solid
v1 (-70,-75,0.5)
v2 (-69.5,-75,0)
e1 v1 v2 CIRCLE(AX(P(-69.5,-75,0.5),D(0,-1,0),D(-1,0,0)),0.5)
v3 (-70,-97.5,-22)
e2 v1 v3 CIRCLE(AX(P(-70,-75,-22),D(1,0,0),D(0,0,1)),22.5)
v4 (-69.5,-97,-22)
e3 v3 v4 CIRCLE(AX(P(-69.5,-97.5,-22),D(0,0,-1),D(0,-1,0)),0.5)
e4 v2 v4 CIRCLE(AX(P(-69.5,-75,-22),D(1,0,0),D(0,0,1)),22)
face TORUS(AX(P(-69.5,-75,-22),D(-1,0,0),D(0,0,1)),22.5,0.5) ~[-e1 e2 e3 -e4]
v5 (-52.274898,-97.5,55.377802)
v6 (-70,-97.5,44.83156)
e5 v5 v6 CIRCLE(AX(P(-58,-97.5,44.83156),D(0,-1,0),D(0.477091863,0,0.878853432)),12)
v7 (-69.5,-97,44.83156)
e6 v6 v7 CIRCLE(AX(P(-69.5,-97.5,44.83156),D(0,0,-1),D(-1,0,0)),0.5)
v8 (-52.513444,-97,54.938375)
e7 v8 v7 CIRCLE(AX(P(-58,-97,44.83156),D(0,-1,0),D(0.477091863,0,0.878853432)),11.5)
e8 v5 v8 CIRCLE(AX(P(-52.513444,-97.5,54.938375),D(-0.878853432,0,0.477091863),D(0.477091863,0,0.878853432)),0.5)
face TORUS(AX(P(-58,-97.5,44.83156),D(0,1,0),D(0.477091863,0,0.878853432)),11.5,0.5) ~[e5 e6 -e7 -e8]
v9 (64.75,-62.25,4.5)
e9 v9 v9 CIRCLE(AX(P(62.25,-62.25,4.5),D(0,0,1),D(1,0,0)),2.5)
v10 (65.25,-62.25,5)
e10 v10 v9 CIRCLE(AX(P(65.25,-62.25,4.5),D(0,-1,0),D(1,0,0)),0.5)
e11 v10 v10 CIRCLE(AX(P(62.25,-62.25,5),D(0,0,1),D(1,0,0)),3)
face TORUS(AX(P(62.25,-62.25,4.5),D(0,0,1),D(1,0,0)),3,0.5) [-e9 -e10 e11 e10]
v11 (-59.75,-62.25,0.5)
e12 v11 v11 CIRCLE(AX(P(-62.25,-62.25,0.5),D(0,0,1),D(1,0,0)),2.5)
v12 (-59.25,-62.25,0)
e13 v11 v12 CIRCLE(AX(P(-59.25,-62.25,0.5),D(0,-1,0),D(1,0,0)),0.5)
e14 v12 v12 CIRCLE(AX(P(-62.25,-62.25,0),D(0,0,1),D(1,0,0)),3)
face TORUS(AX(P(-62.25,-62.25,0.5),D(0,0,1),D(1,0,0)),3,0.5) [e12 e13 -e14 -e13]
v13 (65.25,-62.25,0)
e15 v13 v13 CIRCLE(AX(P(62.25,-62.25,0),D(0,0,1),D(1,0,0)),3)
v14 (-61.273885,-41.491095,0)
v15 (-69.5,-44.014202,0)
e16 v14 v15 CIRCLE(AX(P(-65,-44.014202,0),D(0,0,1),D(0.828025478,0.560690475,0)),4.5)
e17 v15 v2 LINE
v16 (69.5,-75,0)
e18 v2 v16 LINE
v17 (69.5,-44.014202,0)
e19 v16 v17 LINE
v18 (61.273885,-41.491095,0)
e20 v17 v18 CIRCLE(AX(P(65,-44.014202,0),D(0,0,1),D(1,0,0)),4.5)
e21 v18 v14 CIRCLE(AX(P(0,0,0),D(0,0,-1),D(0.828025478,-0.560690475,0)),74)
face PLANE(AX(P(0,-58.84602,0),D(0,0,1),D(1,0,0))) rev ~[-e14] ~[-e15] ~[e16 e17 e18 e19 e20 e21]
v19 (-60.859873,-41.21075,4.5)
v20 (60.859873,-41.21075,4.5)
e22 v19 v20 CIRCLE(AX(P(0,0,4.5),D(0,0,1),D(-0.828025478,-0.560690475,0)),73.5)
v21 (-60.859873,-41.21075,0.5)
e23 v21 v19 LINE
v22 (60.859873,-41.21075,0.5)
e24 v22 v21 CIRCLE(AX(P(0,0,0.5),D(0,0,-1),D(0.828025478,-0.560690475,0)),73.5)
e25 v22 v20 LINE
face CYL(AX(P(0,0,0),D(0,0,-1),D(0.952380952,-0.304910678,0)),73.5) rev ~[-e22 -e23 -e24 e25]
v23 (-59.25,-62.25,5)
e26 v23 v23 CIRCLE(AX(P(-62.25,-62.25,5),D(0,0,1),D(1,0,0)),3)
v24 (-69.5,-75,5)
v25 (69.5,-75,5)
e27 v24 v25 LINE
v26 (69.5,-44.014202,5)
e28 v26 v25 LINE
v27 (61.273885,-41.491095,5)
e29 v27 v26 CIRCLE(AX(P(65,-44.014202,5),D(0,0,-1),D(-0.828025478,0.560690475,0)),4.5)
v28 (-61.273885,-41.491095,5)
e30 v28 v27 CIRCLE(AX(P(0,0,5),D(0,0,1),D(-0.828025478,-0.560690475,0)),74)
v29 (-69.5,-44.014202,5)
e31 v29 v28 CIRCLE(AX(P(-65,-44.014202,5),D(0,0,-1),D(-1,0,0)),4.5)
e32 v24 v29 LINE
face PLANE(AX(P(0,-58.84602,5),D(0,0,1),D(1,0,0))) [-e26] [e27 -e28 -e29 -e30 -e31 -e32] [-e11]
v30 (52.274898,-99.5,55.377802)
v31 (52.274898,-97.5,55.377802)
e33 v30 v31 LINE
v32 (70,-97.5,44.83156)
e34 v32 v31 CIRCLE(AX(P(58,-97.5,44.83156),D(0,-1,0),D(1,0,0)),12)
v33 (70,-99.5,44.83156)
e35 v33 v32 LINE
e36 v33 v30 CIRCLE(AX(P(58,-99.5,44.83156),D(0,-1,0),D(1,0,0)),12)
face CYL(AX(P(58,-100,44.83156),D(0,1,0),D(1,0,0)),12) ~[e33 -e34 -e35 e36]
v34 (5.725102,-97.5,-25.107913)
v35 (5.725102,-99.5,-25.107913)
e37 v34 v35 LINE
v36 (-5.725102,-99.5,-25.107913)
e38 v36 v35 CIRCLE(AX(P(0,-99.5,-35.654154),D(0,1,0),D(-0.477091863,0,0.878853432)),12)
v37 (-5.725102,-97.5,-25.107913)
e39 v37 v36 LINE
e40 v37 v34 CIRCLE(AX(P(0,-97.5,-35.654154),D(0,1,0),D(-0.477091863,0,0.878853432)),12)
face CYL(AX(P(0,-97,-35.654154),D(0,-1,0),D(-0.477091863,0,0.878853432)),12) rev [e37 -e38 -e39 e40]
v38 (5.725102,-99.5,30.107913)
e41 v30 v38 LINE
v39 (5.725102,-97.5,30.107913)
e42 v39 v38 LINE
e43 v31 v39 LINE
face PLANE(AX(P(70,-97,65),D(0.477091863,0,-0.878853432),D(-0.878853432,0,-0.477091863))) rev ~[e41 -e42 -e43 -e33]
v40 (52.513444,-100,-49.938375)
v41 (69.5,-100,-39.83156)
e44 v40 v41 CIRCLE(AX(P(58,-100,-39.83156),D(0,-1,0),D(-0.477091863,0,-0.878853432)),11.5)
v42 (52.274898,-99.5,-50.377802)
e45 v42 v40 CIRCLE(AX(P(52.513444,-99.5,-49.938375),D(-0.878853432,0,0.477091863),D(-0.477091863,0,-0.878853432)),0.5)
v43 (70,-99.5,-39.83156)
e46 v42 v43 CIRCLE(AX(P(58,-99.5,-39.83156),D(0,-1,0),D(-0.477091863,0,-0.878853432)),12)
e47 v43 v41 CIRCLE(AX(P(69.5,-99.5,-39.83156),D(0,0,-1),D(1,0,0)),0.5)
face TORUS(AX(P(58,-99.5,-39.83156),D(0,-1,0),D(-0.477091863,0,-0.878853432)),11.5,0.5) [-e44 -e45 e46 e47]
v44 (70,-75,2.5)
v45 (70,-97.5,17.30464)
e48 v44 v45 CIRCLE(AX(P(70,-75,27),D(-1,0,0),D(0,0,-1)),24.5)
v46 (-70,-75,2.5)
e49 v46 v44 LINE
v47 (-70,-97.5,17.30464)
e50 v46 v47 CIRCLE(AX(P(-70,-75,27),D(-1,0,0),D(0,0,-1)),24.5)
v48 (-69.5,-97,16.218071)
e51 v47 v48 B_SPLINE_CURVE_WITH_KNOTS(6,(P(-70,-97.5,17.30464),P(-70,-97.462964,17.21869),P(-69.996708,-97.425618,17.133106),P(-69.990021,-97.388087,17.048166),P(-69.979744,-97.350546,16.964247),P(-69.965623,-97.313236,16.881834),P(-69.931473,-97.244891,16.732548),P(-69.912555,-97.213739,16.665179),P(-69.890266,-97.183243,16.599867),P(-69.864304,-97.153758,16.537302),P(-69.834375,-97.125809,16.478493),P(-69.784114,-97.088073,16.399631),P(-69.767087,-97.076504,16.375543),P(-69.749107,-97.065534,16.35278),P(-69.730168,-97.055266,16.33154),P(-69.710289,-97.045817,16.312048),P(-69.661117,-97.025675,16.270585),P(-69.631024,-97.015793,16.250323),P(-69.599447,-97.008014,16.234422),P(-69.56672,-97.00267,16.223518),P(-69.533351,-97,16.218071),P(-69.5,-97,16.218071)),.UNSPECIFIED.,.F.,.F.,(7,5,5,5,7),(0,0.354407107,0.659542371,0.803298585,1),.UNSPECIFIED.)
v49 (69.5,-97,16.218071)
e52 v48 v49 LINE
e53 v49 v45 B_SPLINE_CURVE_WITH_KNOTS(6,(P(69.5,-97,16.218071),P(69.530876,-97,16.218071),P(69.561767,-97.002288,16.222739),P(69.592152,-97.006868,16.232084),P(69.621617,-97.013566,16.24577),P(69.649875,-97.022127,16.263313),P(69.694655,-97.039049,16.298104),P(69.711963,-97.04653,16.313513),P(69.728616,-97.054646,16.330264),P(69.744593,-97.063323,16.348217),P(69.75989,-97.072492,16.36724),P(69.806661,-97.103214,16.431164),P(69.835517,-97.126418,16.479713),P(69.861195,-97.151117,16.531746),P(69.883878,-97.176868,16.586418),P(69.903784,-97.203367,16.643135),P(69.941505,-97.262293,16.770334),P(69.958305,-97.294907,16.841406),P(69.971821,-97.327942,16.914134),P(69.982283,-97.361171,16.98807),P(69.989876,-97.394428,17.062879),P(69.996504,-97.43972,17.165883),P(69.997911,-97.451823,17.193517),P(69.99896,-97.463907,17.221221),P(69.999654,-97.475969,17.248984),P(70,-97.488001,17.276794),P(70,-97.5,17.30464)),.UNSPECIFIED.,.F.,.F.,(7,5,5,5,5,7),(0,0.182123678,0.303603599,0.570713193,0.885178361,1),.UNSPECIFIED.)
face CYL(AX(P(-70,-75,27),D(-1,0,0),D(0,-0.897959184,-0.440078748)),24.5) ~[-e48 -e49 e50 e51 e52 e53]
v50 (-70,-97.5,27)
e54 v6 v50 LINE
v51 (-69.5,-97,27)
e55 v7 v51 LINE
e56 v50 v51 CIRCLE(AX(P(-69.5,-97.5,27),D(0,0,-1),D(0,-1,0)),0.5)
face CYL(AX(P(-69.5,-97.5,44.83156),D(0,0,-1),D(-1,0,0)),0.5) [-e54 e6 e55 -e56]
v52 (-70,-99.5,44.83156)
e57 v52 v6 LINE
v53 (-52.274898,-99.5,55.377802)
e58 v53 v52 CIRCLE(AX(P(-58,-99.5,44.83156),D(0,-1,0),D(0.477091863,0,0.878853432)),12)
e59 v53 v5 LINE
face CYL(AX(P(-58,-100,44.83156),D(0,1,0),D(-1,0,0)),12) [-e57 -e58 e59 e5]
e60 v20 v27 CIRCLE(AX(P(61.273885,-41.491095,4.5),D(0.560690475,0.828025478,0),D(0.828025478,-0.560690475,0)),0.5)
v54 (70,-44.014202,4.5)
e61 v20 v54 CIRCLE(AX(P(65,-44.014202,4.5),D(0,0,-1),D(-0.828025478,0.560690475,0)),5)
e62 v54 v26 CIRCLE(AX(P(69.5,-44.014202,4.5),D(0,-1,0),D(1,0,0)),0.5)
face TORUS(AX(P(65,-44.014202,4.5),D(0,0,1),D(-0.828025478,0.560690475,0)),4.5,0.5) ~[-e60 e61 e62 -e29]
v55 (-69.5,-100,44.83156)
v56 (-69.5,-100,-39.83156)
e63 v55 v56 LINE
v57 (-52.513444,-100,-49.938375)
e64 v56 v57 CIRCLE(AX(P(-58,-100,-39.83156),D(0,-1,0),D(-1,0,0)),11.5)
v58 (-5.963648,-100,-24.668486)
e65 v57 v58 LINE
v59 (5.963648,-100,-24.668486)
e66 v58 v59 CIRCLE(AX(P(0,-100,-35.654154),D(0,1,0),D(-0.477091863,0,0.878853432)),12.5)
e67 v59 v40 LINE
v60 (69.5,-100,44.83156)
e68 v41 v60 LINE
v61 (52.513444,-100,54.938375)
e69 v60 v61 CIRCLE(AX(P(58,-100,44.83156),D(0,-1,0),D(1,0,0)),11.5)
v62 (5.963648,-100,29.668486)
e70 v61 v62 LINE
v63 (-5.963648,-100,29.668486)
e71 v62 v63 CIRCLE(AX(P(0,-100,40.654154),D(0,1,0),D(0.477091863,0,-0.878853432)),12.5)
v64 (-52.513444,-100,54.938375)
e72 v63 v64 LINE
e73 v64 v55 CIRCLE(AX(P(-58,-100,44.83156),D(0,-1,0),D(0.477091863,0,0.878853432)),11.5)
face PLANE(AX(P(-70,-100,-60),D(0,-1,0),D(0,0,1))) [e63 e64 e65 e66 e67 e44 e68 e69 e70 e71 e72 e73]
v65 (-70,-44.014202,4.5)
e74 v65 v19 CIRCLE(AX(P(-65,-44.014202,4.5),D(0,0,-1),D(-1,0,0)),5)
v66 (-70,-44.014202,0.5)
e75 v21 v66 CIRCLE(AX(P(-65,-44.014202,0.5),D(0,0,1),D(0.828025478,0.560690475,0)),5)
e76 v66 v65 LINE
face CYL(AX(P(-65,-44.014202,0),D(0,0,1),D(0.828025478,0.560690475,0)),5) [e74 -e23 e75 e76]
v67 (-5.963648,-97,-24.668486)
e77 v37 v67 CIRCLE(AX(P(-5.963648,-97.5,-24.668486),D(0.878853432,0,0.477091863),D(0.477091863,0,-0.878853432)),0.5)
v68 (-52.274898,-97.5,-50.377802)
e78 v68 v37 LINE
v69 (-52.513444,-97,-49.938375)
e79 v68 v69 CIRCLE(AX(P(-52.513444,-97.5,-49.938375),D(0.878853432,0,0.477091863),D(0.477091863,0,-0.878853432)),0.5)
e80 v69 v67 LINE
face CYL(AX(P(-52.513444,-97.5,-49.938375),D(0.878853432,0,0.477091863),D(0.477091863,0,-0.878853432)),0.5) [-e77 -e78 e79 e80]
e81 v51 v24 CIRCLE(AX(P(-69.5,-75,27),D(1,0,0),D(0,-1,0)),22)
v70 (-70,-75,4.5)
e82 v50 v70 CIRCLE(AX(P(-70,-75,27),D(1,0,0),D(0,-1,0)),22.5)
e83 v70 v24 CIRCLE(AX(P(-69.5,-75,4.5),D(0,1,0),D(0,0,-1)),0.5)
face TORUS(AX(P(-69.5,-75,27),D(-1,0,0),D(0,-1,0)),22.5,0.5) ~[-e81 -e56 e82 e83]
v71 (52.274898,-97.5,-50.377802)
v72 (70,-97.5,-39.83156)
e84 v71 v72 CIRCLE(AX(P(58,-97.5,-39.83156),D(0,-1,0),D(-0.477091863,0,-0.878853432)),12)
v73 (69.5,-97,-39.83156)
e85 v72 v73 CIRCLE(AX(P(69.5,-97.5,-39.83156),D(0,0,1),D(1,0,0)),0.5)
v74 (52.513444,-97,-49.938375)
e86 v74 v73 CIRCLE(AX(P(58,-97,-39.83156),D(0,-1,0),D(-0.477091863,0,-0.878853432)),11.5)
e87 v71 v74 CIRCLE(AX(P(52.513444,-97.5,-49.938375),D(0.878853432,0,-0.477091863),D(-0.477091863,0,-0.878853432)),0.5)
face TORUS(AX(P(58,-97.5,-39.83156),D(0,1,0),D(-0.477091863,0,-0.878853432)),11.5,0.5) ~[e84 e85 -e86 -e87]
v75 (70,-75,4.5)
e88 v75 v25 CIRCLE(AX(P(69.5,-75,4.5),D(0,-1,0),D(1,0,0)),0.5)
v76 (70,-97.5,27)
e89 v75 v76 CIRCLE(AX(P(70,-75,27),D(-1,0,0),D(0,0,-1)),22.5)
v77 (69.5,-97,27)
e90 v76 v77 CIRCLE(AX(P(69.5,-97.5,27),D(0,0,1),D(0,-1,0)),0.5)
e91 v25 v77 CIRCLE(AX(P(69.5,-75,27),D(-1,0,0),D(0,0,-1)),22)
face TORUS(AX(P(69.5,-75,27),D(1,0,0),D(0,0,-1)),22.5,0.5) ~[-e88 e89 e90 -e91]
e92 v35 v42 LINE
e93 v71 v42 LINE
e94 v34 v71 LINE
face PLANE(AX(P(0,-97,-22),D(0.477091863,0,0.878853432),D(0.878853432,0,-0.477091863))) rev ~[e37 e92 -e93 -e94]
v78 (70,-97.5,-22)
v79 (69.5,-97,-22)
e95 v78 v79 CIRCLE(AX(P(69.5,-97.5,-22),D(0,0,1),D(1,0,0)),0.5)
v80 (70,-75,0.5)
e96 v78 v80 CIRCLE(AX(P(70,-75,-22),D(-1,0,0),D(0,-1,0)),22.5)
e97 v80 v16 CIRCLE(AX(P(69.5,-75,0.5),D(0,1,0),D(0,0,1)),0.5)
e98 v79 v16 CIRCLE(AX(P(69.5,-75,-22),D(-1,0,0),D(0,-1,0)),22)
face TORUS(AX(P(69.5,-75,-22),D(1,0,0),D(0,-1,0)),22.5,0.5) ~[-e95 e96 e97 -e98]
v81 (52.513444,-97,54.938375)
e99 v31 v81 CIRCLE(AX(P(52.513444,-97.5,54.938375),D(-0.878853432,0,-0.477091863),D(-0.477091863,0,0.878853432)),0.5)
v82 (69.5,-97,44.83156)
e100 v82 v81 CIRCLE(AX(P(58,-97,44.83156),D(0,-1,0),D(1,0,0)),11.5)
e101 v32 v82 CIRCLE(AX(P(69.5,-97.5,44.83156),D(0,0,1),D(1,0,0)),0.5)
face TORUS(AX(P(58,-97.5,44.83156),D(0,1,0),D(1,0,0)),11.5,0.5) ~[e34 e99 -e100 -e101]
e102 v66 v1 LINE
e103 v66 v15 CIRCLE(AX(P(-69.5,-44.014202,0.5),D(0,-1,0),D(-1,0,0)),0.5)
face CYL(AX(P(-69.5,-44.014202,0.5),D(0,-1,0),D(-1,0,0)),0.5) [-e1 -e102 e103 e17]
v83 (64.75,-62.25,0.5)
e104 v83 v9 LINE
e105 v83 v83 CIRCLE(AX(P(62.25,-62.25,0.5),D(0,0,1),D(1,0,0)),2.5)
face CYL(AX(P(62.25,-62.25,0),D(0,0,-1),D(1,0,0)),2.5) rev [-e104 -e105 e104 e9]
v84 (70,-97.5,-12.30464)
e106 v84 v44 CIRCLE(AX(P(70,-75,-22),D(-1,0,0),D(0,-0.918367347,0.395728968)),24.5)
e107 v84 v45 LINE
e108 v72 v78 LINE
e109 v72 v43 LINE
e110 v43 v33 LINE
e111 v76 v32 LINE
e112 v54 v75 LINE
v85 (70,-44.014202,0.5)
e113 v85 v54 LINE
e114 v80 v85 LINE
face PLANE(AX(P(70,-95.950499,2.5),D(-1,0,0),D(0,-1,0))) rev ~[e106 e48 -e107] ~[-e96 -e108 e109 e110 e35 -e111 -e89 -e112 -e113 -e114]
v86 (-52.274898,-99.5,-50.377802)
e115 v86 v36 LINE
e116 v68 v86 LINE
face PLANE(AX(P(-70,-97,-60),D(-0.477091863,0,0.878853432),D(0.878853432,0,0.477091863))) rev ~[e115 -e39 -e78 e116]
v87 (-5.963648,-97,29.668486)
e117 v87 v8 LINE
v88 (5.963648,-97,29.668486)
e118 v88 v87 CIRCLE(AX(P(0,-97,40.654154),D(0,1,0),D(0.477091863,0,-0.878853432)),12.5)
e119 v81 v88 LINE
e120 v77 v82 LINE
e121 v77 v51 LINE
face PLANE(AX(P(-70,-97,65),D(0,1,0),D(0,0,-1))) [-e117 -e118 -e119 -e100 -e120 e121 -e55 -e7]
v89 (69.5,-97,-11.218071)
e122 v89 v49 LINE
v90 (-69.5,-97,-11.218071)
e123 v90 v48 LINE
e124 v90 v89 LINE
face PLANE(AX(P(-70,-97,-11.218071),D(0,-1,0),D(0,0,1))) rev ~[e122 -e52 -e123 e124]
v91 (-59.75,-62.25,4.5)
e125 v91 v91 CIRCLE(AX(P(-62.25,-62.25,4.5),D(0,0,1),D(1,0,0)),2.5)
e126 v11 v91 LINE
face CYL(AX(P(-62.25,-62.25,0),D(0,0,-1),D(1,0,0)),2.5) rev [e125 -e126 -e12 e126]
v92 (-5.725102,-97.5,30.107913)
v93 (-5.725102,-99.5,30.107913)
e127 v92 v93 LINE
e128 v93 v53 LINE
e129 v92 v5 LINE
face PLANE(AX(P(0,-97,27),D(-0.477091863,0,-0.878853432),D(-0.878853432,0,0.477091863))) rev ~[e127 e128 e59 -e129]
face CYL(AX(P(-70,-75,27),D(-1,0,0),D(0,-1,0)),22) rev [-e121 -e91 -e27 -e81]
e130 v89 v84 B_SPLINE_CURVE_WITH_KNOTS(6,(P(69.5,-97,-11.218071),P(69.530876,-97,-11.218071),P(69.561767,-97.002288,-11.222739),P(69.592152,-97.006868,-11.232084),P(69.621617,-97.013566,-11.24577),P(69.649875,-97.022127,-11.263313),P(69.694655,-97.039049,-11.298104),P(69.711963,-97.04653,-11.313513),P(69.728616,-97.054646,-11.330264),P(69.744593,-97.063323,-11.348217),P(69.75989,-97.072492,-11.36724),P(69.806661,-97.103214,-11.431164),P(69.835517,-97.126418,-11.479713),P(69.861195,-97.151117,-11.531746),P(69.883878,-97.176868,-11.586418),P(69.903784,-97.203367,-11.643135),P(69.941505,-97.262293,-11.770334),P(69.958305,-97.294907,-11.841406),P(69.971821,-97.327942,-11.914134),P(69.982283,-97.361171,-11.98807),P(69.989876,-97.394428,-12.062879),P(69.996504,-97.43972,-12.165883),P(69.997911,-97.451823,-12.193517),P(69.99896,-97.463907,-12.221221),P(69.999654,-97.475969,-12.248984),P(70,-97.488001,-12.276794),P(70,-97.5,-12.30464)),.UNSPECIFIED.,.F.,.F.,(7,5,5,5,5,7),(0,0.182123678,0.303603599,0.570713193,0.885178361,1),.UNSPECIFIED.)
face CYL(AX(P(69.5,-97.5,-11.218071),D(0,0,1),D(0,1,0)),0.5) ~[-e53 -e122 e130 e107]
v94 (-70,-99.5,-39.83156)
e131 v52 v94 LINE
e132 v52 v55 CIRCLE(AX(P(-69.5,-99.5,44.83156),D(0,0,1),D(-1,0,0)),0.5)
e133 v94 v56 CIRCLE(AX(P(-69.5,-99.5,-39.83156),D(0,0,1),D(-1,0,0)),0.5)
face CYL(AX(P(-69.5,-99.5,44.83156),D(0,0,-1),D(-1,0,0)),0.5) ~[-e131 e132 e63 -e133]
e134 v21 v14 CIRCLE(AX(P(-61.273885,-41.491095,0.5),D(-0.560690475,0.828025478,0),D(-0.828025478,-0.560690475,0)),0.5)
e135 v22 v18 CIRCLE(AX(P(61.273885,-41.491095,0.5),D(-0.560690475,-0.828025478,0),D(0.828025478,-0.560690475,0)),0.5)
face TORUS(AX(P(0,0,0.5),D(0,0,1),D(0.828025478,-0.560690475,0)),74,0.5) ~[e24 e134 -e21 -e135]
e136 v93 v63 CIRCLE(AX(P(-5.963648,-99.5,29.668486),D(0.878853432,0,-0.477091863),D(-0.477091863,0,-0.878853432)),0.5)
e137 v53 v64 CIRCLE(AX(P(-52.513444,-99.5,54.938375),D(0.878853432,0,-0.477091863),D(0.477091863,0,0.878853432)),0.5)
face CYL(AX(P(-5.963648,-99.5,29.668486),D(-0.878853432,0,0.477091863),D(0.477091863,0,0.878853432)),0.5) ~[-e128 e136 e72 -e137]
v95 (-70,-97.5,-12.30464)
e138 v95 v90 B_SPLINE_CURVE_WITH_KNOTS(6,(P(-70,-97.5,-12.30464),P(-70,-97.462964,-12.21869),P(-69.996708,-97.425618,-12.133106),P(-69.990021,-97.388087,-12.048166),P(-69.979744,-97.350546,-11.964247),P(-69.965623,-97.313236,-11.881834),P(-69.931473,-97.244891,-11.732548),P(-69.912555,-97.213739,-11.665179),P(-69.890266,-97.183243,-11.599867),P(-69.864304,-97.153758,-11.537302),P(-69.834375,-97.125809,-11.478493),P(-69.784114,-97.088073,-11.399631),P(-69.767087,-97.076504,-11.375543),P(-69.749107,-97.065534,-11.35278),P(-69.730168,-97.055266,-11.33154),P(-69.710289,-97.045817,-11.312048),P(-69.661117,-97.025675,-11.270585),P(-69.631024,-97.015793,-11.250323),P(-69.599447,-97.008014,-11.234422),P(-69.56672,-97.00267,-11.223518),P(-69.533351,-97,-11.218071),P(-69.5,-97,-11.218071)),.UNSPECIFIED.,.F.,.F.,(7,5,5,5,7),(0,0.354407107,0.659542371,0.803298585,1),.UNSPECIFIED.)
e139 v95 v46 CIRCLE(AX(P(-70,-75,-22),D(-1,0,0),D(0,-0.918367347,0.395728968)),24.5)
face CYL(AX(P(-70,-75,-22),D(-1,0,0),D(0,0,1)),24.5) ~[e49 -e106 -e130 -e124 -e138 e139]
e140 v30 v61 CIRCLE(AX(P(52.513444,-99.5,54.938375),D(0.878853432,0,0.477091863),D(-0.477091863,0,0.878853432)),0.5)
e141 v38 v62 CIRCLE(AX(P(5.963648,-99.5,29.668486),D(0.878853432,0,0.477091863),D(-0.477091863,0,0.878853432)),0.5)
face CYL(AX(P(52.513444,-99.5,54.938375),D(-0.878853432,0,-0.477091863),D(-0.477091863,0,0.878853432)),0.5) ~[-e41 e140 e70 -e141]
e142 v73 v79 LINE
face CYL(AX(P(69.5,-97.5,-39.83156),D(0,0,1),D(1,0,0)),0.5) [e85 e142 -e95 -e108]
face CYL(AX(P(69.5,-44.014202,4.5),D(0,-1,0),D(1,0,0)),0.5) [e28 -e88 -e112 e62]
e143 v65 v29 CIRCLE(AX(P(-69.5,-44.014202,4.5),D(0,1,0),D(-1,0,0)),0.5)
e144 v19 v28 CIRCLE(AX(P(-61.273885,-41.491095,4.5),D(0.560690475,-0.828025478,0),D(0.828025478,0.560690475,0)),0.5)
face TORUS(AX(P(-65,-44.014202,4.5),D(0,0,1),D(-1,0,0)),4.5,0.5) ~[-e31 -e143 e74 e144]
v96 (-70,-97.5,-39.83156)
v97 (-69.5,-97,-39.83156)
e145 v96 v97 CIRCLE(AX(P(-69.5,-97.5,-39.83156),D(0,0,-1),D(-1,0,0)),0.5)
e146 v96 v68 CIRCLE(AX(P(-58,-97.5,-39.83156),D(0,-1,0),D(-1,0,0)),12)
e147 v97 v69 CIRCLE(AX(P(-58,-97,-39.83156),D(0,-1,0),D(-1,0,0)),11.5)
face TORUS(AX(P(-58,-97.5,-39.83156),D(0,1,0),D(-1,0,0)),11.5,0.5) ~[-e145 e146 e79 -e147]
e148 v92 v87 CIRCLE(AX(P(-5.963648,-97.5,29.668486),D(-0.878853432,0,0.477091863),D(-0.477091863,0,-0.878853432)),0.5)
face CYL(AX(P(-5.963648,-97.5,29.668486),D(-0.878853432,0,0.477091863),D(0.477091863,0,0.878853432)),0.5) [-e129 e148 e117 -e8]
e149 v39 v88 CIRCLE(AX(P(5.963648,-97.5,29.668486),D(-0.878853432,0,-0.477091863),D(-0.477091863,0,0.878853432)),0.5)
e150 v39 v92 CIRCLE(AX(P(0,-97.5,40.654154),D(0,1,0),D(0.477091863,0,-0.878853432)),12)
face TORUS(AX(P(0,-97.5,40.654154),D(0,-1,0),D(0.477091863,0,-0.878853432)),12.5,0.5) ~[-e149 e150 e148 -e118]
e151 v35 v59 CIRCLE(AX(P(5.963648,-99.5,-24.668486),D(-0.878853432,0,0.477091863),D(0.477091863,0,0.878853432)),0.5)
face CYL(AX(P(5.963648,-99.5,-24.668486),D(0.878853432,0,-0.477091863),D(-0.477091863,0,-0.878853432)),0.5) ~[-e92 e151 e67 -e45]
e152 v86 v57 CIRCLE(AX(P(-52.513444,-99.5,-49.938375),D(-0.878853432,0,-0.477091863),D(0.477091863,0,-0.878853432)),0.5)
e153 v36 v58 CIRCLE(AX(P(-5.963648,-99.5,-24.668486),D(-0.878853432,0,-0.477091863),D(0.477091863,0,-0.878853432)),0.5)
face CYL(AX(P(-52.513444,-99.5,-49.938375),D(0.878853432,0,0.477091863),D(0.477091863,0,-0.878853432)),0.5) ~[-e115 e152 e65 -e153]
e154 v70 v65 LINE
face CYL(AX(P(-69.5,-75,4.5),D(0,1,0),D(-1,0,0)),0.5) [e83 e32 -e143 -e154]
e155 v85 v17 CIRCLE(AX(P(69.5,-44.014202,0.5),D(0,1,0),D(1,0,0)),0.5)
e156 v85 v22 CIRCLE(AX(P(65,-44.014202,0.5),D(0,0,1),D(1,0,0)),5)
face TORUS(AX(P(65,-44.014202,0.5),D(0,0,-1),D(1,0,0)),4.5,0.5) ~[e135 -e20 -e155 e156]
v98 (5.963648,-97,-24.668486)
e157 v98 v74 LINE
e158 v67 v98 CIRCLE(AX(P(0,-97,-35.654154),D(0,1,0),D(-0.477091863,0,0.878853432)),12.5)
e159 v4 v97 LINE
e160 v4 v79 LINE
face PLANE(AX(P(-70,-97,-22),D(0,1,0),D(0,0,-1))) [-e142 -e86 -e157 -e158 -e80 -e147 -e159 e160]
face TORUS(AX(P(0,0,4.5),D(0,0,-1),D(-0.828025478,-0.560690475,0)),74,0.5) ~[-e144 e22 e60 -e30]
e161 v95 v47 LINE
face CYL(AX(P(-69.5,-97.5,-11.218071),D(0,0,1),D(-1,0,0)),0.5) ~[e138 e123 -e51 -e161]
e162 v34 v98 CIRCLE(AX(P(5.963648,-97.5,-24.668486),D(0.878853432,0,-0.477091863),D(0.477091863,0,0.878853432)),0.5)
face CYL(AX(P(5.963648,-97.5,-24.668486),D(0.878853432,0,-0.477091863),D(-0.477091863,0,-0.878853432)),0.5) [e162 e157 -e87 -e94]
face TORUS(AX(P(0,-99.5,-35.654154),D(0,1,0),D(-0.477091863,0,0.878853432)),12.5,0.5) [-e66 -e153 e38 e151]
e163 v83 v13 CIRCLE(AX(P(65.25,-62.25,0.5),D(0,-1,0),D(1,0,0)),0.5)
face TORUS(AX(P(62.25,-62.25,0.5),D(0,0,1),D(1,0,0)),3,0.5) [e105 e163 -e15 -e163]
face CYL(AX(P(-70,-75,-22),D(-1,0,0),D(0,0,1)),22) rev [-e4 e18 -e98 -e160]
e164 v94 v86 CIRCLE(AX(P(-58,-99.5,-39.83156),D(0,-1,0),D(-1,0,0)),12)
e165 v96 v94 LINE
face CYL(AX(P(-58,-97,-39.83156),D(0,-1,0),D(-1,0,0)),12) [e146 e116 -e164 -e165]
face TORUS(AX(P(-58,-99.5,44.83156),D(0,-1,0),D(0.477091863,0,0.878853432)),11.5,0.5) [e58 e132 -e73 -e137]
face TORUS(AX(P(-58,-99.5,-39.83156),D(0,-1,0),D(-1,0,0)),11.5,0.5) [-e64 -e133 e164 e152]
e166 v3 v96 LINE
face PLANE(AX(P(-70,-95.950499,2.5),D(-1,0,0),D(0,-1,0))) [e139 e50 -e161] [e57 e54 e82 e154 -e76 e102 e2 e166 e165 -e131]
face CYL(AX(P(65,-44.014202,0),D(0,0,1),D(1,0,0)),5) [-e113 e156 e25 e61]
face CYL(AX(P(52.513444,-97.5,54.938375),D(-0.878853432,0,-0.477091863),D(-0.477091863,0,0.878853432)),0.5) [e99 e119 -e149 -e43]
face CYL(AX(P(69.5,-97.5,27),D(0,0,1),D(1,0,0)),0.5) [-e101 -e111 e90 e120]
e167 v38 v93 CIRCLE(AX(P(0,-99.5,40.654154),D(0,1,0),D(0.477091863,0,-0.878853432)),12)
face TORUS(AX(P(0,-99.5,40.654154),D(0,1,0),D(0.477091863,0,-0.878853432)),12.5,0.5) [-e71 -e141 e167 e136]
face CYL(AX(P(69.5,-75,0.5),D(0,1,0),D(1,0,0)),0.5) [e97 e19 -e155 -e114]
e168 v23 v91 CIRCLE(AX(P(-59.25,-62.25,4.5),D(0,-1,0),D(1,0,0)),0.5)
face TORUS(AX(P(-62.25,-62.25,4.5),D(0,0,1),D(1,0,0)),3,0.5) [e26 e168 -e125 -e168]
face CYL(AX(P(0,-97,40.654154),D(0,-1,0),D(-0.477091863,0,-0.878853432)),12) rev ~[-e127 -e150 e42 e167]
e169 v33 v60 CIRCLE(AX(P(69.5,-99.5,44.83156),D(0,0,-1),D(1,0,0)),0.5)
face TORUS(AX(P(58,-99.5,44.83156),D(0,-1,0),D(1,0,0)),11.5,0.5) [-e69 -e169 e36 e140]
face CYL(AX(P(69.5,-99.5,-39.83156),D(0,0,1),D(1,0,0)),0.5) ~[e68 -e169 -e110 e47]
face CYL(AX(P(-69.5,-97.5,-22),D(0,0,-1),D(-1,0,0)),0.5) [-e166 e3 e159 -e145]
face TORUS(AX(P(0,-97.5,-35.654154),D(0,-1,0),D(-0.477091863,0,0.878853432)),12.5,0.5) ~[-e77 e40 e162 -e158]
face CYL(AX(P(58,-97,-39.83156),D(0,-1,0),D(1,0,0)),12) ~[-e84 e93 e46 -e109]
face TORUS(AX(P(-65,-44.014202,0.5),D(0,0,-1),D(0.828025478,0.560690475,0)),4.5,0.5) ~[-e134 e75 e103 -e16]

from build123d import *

# Parameters (mm, degrees)
F0_R     = 2.5
F1_DEPTH = 5
F3_DEPTH = 140
F4_DEPTH = 140.001
F5_F1_R  = 5
F5_F2_R  = 5
F7_DEPTH = 3.001
F8_R     = 12
F9_R     = 0.5


# Not quite as in the source:
# - a feature names something its author has since deleted; it is built from what else it names


with BuildPart() as f1:
    # F0 (on Top) → F1 (new body)
    with BuildSketch(Plane.XY):
        with BuildLine():
            ThreePointArc((70, -22.410934831), (0, -73.5), (-70, -22.410934831))
            Line((-70, -22.410934831), (-70, -75))
            Line((-70, -75), (70, -75))
            Line((70, -75), (70, -22.410934831))
        make_face()
        with Locations((-62.25, -62.25)):
            Circle(F0_R, mode=Mode.SUBTRACT)
        with Locations((62.25, -62.25)):
            Circle(F0_R, mode=Mode.SUBTRACT)
    extrude(amount=F1_DEPTH)

    # F2 (on face) → F3 (join, through all)
    with BuildSketch(Plane(origin=(-70, 0, 0), x_dir=(0, -1, 0), z_dir=(-1, 0, 0))):
        with BuildLine():
            ThreePointArc((75, 0), (90.5563491861, -6.4436508139), (97, -22))
            Line((97, -22), (97, -60))
            Line((97, -60), (100, -60))
            Line((100, -60), (100, 65))
            Line((100, 65), (97, 65))
            Line((97, 65), (97, 27))
            ThreePointArc((97, 27), (90.5563491861, 11.4436508139), (75, 5))
            Line((75, 5), (75, 2.5))
            Line((75, 2.5), (75, 0))
        make_face()
        with BuildLine():
            ThreePointArc((97, -11.2180706736), (87.9632698711, -1.2104922076), (75, 2.5))
            ThreePointArc((75, 2.5), (87.9632698711, 6.2104922076), (97, 16.2180706736))
            Line((97, 16.2180706736), (97, -11.2180706736))
        make_face(mode=Mode.SUBTRACT)
        with BuildLine():
            ThreePointArc((97, 16.2180706736), (87.9632698711, 6.2104922076), (75, 2.5))
            ThreePointArc((75, 2.5), (87.9632698711, -1.2104922076), (97, -11.2180706736))
            Line((97, -11.2180706736), (97, 16.2180706736))
        make_face()
    extrude(amount=-F3_DEPTH)

    # F2 (on face) → F4 (cut, through all)
    with BuildSketch(Plane(origin=(-70, 0, 0), x_dir=(0, -1, 0), z_dir=(-1, 0, 0))):
        with BuildLine():
            ThreePointArc((97, 16.2180706736), (87.9632698711, 6.2104922076), (75, 2.5))
            ThreePointArc((75, 2.5), (87.9632698711, -1.2104922076), (97, -11.2180706736))
            Line((97, -11.2180706736), (97, 16.2180706736))
        make_face()
    extrude(amount=-F4_DEPTH, mode=Mode.SUBTRACT)

    # F5: fillet of radius 5 on 2 edges, made by hand

    # F5_f1
    f5_f1_edges = [f1.edges().sort_by_distance(p)[0] for p in [
        (70, -22.410934831, 2.5),
    ]]
    fillet(f5_f1_edges, radius=F5_F1_R)

    # F5_f2
    f5_f2_edges = [f1.edges().sort_by_distance(p)[0] for p in [
        (-70, -22.410934831, 2.5),
    ]]
    fillet(f5_f2_edges, radius=F5_F2_R)

    # F6 (on face) → F7 (cut, through all)
    with BuildSketch(Plane(origin=(0, -97, 0), x_dir=(-1, 0, 0), z_dir=(0, 1, 0))):
        Polygon((0, 27), (70, 65), (0, 65), (-70, 65), align=None)
        Polygon((0, -60), (70, -60), (0, -22), (-70, -60), align=None)
    extrude(amount=-F7_DEPTH, mode=Mode.SUBTRACT)

    # F8
    f8_edges = [f1.edges().sort_by_distance(p)[0] for p in [
        (0, -98.5, 27),
        (-70, -98.5, 65),
        (70, -98.5, 65),
        (0, -98.5, -22),
        (-70, -98.5, -60),
        (70, -98.5, -60),
    ]]
    fillet(f8_edges, radius=F8_R)

    # F9
    f9_edges = [f1.edges().sort_by_distance(p)[0] for p in [
        (0, -73.5, 0),
        (-70, -97, 2.5),
        (-35, -97, 27),
        (35, -97, 27),
        (0, -75, 5),
        (-70, -90.556349, 11.443651),
        (70, -90.556349, 11.443651),
        (-70, -97, 35.91578),
        (-64.13591, -97, 55.144204),
        (-29, -97, 42.742857),
        (-2.862551, -97, 28.553956),
        (29, -97, 42.742857),
        (64.13591, -97, 55.144204),
        (0, -97, 28.654154),
        (70, -97, 35.91578),
        (70, -97, 2.5),
        (70, -100, 2.5),
        (-70, -100, 2.5),
        (64.75, -62.25, 2.5),
        (59.75, -62.25, 0),
        (59.75, -62.25, 5),
        (-59.75, -62.25, 2.5),
        (-64.75, -62.25, 0),
        (-64.75, -62.25, 5),
        (-70, -97, -30.91578),
        (-70, -90.556349, -6.443651),
        (-70, -59.507101, 0),
        (-70, -59.507101, 5),
        (-64.13591, -97, -50.144204),
        (-29, -97, -37.742857),
        (-64.13591, -100, -50.144204),
        (70, -90.556349, -6.443651),
        (-64.13591, -100, 55.144204),
        (-29, -100, -37.742857),
        (-29, -100, 42.742857),
        (0, -100, -23.654154),
        (0, -100, 28.654154),
        (29, -100, -37.742857),
        (29, -100, 42.742857),
        (64.13591, -100, -50.144204),
        (64.13591, -100, 55.144204),
        (-66.466179, -39.234002, 0),
        (66.466179, -39.234002, 0),
        (70, -59.507101, 0),
        (-66.466179, -39.234002, 5),
        (0, -73.5, 5),
        (66.466179, -39.234002, 5),
        (70, -59.507101, 5),
        (29, -97, -37.742857),
        (0, -97, -23.654154),
        (64.13591, -97, -50.144204),
        (70, -97, -30.91578),
    ]]
    fillet(f9_edges, radius=F9_R)


solid = f1.part
